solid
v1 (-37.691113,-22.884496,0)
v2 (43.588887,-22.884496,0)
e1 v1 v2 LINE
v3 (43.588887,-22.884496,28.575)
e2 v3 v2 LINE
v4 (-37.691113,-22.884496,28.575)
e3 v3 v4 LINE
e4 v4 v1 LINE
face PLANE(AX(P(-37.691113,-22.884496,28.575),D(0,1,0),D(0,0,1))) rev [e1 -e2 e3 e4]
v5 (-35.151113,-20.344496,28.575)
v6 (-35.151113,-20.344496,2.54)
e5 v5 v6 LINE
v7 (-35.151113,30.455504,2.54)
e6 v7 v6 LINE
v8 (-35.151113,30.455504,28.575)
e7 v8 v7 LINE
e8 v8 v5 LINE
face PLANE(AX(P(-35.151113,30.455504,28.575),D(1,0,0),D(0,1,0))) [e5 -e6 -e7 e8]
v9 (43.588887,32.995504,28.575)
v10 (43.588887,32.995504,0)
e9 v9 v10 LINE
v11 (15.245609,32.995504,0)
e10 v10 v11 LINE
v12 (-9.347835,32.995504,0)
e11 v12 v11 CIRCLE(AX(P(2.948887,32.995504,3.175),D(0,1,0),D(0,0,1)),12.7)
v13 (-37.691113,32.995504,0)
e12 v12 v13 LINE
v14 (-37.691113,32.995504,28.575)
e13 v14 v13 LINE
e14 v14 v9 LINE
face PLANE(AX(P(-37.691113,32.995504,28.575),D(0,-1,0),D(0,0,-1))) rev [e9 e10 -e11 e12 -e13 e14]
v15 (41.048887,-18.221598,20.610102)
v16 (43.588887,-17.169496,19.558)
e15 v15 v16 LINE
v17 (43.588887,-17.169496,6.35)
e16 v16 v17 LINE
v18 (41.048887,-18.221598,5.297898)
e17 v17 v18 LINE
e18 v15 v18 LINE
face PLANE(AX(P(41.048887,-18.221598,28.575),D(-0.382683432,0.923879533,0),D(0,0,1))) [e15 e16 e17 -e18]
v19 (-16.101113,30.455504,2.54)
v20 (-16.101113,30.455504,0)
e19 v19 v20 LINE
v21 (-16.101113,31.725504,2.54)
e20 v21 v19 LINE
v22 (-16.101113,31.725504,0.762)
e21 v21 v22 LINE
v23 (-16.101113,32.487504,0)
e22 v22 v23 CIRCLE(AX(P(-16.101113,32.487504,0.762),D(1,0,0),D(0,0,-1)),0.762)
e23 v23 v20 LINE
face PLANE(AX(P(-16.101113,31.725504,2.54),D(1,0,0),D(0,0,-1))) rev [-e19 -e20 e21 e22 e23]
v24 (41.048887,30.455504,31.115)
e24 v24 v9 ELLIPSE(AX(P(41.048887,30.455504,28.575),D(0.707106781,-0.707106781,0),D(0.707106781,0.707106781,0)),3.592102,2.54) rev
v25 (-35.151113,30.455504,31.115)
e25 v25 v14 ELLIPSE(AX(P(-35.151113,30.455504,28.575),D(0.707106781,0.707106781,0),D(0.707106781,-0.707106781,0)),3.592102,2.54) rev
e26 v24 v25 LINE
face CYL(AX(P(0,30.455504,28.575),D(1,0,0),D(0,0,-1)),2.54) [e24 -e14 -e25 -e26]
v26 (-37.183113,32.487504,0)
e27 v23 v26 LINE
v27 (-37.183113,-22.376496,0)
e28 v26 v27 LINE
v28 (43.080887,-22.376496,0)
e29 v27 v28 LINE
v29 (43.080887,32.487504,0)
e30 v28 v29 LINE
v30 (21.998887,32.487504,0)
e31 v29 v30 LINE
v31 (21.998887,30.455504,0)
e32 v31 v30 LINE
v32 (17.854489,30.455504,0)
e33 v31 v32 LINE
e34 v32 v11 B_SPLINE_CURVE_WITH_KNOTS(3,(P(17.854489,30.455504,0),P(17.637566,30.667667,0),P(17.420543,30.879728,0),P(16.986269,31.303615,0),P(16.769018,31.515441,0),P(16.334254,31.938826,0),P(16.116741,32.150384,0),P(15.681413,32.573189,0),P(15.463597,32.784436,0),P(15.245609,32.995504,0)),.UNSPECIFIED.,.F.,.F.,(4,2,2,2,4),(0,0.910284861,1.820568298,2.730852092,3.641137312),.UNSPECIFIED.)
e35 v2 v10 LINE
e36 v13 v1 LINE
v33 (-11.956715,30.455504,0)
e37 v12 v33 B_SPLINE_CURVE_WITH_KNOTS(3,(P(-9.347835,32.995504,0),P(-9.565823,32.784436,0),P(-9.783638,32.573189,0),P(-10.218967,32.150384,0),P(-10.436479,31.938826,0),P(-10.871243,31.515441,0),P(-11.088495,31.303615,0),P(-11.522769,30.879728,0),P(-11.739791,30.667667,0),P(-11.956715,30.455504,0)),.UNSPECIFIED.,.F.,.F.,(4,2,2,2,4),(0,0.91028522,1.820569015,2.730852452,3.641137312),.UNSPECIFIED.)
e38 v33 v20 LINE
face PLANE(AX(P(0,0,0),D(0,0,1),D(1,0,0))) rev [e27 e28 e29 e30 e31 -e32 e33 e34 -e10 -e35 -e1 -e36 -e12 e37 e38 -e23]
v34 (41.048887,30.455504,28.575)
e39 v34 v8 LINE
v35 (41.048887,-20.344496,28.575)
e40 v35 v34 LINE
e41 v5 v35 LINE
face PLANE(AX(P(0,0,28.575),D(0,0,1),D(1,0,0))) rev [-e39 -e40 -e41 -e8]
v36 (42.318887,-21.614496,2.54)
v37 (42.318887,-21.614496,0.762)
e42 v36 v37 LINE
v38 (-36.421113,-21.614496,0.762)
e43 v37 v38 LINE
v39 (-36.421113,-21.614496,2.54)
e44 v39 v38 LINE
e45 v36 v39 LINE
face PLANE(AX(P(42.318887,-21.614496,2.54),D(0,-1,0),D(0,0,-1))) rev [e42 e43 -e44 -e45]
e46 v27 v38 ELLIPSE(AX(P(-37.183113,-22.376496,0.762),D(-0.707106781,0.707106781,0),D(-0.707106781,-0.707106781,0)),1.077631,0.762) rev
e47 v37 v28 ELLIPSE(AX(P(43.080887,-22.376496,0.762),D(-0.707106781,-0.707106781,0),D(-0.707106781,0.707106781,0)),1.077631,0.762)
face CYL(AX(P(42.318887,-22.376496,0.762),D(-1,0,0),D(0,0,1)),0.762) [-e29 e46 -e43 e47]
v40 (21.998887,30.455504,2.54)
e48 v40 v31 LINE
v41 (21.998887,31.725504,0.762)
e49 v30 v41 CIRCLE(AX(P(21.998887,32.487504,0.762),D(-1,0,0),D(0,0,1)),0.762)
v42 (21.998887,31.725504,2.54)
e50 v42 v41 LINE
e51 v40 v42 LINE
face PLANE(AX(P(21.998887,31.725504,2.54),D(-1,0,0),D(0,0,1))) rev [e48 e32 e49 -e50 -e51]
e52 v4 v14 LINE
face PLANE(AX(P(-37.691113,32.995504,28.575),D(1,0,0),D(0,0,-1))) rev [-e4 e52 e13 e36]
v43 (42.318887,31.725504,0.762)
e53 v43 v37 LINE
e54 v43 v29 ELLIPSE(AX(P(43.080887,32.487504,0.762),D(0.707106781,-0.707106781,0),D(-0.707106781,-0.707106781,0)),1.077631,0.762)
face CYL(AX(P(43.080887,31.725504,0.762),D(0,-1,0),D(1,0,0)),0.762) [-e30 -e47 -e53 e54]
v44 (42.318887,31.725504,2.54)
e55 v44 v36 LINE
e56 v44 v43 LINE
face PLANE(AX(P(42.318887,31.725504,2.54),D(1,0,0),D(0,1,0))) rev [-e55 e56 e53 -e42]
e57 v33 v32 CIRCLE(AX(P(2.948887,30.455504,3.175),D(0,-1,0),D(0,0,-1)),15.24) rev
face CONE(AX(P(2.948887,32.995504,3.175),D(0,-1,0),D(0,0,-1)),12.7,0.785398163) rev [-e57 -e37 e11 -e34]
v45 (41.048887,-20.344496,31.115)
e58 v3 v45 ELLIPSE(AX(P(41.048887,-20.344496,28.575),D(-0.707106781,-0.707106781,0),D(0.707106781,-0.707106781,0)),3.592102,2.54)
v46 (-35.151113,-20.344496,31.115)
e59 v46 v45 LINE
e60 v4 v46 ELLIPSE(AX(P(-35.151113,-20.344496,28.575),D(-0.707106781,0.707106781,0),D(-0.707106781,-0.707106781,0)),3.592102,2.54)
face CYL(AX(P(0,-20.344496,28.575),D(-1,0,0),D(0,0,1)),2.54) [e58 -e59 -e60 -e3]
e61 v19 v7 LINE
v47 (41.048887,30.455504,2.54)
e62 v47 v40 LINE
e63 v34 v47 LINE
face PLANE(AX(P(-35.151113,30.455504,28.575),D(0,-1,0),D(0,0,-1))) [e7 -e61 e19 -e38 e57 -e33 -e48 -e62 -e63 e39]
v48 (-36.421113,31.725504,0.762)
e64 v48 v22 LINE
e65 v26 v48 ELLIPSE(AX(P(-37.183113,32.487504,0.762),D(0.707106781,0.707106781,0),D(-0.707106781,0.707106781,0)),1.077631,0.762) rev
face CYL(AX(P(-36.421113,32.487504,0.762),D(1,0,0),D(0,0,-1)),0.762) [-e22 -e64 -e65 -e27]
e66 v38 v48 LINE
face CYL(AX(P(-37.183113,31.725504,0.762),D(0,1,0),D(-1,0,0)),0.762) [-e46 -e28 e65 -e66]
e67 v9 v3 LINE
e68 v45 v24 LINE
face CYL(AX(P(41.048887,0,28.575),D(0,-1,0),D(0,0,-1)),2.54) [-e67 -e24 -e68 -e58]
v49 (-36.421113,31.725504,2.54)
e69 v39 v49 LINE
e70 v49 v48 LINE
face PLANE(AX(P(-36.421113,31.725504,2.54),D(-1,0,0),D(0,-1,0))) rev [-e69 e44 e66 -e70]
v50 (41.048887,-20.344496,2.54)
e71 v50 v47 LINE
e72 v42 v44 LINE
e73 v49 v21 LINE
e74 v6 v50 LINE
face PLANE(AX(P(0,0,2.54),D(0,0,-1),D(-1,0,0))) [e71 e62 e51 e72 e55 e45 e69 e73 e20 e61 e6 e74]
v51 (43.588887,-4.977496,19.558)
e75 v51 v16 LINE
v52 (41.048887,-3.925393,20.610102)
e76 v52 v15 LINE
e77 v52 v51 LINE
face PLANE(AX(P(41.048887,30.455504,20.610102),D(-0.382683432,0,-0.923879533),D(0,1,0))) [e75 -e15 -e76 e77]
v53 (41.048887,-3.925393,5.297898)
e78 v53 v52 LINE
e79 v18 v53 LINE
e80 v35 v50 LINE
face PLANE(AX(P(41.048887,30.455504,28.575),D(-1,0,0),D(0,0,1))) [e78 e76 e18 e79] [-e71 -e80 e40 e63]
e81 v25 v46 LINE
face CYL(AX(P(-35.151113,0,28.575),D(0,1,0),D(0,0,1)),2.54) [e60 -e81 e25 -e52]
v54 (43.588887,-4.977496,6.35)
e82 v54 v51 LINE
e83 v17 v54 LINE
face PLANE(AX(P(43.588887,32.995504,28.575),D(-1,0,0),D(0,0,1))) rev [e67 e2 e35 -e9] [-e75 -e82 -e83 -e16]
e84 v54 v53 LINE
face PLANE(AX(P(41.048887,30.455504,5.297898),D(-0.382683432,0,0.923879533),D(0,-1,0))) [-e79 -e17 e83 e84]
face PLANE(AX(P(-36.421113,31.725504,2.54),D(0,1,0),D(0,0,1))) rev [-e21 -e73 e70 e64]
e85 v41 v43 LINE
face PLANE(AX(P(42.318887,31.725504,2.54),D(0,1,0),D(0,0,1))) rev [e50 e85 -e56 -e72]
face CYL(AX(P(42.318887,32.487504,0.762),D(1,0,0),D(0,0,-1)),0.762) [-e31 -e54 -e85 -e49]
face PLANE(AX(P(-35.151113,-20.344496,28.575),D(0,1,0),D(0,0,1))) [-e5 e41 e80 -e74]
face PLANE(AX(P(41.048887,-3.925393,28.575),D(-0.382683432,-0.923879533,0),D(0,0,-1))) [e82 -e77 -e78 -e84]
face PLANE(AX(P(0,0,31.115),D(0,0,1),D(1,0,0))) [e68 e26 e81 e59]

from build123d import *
from OCP.BRepFilletAPI import BRepFilletAPI_MakeChamfer

# Parameters (mm, degrees)
SKETCH1_W           = 81.28
SKETCH1_H           = 55.88
SKETCH1_W_2         = 76.2
SKETCH1_H_2         = 50.8
BOSS_EXTRUDE1_DEPTH = 28.575
SKETCH2_W           = 81.28
SKETCH2_H           = 55.88
BOSS_EXTRUDE2_DEPTH = 2.54
SKETCH5_W           = 13.208
SKETCH5_H           = 12.192
CUT_EXTRUDE1_DEPTH  = 2.54
SKETCH6_R           = 12.7
CUT_EXTRUDE2_DEPTH  = 2.54
CHAMFER4_SIZE       = 1.052102448
CHAMFER4_SIZE_2     = 2.54
CUT_EXTRUDE3_DEPTH  = 2.54
CHAMFER5_SIZE       = 2.54
FILLET2_R           = 0.762
FILLET3_R           = 2.54


with BuildPart() as part:
    # Sketch1 → Boss-Extrude1 (new body)
    with BuildSketch(Plane.XY):
        with Locations((2.94888724, 5.055504451)):
            Rectangle(SKETCH1_W, SKETCH1_H)
        with Locations((2.94888724, 5.055504451)):
            Rectangle(SKETCH1_W_2, SKETCH1_H_2, mode=Mode.SUBTRACT)
    extrude(amount=BOSS_EXTRUDE1_DEPTH)

    # Sketch2 → Boss-Extrude2 (add)
    with BuildSketch(Plane.XY.offset(28.575)):
        with Locations((2.94888724, 5.055504451)):
            Rectangle(SKETCH2_W, SKETCH2_H)
    extrude(amount=BOSS_EXTRUDE2_DEPTH)

    # Sketch5 → Cut-Extrude1 (cut)
    with BuildSketch(Plane(origin=(43.58888724, 0, 0), x_dir=(0, 0, -1), z_dir=(1, 0, 0))):
        with Locations((-12.954, -11.073495549)):
            Rectangle(SKETCH5_W, SKETCH5_H)
    extrude(amount=-CUT_EXTRUDE1_DEPTH, mode=Mode.SUBTRACT)

    # Sketch6 → Cut-Extrude2 (cut)
    with BuildSketch(Plane(origin=(0, 32.995504451, 0), x_dir=(1, 0, 0), z_dir=(0, 1, 0))):
        with Locations((2.94888724, -3.175)):
            Circle(SKETCH6_R)
    extrude(amount=-CUT_EXTRUDE2_DEPTH, mode=Mode.SUBTRACT)

    # Chamfer4
    chamfer4_edges_1 = [part.edges().sort_by_distance(p)[0] for p in [
        (41.04888724, -17.169495549, 12.954),
    ]]
    chamfer4_side_1 = [part.faces().sort_by_distance(p)[0] for p in [
        (41.04888724, -17.190537598, 12.954),
    ]]
    chamfer4_edges_2 = [part.edges().sort_by_distance(p)[0] for p in [
        (41.04888724, -11.073495549, 19.558),
    ]]
    chamfer4_side_2 = [part.faces().sort_by_distance(p)[0] for p in [
        (41.04888724, -11.073495549, 19.579042049),
    ]]
    chamfer4_edges_3 = [part.edges().sort_by_distance(p)[0] for p in [
        (41.04888724, -4.977495549, 12.954),
    ]]
    chamfer4_side_3 = [part.faces().sort_by_distance(p)[0] for p in [
        (41.04888724, -4.9564535, 12.954),
    ]]
    chamfer4_edges_4 = [part.edges().sort_by_distance(p)[0] for p in [
        (41.04888724, -11.073495549, 6.35),
    ]]
    chamfer4_side_4 = [part.faces().sort_by_distance(p)[0] for p in [
        (41.04888724, -11.073495549, 6.328957951),
    ]]
    chamfer4 = BRepFilletAPI_MakeChamfer(part.part.solid().wrapped)
    for e in chamfer4_edges_1:
        chamfer4.Add(CHAMFER4_SIZE - 0.0001, CHAMFER4_SIZE_2 - 0.0001, e.wrapped, chamfer4_side_1[0].wrapped)
    for e in chamfer4_edges_2:
        chamfer4.Add(CHAMFER4_SIZE - 0.0001, CHAMFER4_SIZE_2 - 0.0001, e.wrapped, chamfer4_side_2[0].wrapped)
    for e in chamfer4_edges_3:
        chamfer4.Add(CHAMFER4_SIZE - 0.0001, CHAMFER4_SIZE_2 - 0.0001, e.wrapped, chamfer4_side_3[0].wrapped)
    for e in chamfer4_edges_4:
        chamfer4.Add(CHAMFER4_SIZE - 0.0001, CHAMFER4_SIZE_2 - 0.0001, e.wrapped, chamfer4_side_4[0].wrapped)
    add(Compound.cast(chamfer4.Shape()), mode=Mode.REPLACE)  # a hair under: the kernel refuses the full size

    # Sketch8 → Cut-Extrude3 (cut)
    with BuildSketch(Plane(origin=(0, 0, 0), x_dir=(-1, 0, 0), z_dir=(0, 0, -1))):
        Polygon((-41.04888724, 30.455504451), (-21.99888724, 30.455504451), (-21.99888724, 31.725504451), (-42.31888724, 31.725504451), (-42.31888724, -21.614495549), (36.42111276, -21.614495549), (36.42111276, 31.725504451), (16.10111276, 31.725504451), (16.10111276, 30.455504451), (35.15111276, 30.455504451), (35.15111276, -20.344495549), (-41.04888724, -20.344495549), align=None)
    extrude(amount=-CUT_EXTRUDE3_DEPTH, mode=Mode.SUBTRACT)

    # Chamfer5
    chamfer5_edges = [part.edges().sort_by_distance(p)[0] for p in [
        (2.94888724, 30.455504451, 15.875),
    ]]
    chamfer(chamfer5_edges, length=CHAMFER5_SIZE - 0.0001)  # a hair under: the kernel refuses the full size

    # Fillet2
    fillet2_edges = [part.edges().sort_by_distance(p)[0] for p in [
        (32.15888724, 31.725504451, 0),
        (42.31888724, 5.055504451, 0),
        (2.94888724, -21.614495549, 0),
        (-36.42111276, 5.055504451, 0),
        (-26.26111276, 31.725504451, 0),
    ]]
    fillet(fillet2_edges, radius=FILLET2_R)

    # Fillet3
    fillet3_edges = [part.edges().sort_by_distance(p)[0] for p in [
        (-37.69111276, 5.055504451, 31.115),
        (2.94888724, -22.884495549, 31.115),
        (43.58888724, 5.055504451, 31.115),
        (2.94888724, 32.995504451, 31.115),
    ]]
    fillet(fillet3_edges, radius=FILLET3_R)


solid = part.part
